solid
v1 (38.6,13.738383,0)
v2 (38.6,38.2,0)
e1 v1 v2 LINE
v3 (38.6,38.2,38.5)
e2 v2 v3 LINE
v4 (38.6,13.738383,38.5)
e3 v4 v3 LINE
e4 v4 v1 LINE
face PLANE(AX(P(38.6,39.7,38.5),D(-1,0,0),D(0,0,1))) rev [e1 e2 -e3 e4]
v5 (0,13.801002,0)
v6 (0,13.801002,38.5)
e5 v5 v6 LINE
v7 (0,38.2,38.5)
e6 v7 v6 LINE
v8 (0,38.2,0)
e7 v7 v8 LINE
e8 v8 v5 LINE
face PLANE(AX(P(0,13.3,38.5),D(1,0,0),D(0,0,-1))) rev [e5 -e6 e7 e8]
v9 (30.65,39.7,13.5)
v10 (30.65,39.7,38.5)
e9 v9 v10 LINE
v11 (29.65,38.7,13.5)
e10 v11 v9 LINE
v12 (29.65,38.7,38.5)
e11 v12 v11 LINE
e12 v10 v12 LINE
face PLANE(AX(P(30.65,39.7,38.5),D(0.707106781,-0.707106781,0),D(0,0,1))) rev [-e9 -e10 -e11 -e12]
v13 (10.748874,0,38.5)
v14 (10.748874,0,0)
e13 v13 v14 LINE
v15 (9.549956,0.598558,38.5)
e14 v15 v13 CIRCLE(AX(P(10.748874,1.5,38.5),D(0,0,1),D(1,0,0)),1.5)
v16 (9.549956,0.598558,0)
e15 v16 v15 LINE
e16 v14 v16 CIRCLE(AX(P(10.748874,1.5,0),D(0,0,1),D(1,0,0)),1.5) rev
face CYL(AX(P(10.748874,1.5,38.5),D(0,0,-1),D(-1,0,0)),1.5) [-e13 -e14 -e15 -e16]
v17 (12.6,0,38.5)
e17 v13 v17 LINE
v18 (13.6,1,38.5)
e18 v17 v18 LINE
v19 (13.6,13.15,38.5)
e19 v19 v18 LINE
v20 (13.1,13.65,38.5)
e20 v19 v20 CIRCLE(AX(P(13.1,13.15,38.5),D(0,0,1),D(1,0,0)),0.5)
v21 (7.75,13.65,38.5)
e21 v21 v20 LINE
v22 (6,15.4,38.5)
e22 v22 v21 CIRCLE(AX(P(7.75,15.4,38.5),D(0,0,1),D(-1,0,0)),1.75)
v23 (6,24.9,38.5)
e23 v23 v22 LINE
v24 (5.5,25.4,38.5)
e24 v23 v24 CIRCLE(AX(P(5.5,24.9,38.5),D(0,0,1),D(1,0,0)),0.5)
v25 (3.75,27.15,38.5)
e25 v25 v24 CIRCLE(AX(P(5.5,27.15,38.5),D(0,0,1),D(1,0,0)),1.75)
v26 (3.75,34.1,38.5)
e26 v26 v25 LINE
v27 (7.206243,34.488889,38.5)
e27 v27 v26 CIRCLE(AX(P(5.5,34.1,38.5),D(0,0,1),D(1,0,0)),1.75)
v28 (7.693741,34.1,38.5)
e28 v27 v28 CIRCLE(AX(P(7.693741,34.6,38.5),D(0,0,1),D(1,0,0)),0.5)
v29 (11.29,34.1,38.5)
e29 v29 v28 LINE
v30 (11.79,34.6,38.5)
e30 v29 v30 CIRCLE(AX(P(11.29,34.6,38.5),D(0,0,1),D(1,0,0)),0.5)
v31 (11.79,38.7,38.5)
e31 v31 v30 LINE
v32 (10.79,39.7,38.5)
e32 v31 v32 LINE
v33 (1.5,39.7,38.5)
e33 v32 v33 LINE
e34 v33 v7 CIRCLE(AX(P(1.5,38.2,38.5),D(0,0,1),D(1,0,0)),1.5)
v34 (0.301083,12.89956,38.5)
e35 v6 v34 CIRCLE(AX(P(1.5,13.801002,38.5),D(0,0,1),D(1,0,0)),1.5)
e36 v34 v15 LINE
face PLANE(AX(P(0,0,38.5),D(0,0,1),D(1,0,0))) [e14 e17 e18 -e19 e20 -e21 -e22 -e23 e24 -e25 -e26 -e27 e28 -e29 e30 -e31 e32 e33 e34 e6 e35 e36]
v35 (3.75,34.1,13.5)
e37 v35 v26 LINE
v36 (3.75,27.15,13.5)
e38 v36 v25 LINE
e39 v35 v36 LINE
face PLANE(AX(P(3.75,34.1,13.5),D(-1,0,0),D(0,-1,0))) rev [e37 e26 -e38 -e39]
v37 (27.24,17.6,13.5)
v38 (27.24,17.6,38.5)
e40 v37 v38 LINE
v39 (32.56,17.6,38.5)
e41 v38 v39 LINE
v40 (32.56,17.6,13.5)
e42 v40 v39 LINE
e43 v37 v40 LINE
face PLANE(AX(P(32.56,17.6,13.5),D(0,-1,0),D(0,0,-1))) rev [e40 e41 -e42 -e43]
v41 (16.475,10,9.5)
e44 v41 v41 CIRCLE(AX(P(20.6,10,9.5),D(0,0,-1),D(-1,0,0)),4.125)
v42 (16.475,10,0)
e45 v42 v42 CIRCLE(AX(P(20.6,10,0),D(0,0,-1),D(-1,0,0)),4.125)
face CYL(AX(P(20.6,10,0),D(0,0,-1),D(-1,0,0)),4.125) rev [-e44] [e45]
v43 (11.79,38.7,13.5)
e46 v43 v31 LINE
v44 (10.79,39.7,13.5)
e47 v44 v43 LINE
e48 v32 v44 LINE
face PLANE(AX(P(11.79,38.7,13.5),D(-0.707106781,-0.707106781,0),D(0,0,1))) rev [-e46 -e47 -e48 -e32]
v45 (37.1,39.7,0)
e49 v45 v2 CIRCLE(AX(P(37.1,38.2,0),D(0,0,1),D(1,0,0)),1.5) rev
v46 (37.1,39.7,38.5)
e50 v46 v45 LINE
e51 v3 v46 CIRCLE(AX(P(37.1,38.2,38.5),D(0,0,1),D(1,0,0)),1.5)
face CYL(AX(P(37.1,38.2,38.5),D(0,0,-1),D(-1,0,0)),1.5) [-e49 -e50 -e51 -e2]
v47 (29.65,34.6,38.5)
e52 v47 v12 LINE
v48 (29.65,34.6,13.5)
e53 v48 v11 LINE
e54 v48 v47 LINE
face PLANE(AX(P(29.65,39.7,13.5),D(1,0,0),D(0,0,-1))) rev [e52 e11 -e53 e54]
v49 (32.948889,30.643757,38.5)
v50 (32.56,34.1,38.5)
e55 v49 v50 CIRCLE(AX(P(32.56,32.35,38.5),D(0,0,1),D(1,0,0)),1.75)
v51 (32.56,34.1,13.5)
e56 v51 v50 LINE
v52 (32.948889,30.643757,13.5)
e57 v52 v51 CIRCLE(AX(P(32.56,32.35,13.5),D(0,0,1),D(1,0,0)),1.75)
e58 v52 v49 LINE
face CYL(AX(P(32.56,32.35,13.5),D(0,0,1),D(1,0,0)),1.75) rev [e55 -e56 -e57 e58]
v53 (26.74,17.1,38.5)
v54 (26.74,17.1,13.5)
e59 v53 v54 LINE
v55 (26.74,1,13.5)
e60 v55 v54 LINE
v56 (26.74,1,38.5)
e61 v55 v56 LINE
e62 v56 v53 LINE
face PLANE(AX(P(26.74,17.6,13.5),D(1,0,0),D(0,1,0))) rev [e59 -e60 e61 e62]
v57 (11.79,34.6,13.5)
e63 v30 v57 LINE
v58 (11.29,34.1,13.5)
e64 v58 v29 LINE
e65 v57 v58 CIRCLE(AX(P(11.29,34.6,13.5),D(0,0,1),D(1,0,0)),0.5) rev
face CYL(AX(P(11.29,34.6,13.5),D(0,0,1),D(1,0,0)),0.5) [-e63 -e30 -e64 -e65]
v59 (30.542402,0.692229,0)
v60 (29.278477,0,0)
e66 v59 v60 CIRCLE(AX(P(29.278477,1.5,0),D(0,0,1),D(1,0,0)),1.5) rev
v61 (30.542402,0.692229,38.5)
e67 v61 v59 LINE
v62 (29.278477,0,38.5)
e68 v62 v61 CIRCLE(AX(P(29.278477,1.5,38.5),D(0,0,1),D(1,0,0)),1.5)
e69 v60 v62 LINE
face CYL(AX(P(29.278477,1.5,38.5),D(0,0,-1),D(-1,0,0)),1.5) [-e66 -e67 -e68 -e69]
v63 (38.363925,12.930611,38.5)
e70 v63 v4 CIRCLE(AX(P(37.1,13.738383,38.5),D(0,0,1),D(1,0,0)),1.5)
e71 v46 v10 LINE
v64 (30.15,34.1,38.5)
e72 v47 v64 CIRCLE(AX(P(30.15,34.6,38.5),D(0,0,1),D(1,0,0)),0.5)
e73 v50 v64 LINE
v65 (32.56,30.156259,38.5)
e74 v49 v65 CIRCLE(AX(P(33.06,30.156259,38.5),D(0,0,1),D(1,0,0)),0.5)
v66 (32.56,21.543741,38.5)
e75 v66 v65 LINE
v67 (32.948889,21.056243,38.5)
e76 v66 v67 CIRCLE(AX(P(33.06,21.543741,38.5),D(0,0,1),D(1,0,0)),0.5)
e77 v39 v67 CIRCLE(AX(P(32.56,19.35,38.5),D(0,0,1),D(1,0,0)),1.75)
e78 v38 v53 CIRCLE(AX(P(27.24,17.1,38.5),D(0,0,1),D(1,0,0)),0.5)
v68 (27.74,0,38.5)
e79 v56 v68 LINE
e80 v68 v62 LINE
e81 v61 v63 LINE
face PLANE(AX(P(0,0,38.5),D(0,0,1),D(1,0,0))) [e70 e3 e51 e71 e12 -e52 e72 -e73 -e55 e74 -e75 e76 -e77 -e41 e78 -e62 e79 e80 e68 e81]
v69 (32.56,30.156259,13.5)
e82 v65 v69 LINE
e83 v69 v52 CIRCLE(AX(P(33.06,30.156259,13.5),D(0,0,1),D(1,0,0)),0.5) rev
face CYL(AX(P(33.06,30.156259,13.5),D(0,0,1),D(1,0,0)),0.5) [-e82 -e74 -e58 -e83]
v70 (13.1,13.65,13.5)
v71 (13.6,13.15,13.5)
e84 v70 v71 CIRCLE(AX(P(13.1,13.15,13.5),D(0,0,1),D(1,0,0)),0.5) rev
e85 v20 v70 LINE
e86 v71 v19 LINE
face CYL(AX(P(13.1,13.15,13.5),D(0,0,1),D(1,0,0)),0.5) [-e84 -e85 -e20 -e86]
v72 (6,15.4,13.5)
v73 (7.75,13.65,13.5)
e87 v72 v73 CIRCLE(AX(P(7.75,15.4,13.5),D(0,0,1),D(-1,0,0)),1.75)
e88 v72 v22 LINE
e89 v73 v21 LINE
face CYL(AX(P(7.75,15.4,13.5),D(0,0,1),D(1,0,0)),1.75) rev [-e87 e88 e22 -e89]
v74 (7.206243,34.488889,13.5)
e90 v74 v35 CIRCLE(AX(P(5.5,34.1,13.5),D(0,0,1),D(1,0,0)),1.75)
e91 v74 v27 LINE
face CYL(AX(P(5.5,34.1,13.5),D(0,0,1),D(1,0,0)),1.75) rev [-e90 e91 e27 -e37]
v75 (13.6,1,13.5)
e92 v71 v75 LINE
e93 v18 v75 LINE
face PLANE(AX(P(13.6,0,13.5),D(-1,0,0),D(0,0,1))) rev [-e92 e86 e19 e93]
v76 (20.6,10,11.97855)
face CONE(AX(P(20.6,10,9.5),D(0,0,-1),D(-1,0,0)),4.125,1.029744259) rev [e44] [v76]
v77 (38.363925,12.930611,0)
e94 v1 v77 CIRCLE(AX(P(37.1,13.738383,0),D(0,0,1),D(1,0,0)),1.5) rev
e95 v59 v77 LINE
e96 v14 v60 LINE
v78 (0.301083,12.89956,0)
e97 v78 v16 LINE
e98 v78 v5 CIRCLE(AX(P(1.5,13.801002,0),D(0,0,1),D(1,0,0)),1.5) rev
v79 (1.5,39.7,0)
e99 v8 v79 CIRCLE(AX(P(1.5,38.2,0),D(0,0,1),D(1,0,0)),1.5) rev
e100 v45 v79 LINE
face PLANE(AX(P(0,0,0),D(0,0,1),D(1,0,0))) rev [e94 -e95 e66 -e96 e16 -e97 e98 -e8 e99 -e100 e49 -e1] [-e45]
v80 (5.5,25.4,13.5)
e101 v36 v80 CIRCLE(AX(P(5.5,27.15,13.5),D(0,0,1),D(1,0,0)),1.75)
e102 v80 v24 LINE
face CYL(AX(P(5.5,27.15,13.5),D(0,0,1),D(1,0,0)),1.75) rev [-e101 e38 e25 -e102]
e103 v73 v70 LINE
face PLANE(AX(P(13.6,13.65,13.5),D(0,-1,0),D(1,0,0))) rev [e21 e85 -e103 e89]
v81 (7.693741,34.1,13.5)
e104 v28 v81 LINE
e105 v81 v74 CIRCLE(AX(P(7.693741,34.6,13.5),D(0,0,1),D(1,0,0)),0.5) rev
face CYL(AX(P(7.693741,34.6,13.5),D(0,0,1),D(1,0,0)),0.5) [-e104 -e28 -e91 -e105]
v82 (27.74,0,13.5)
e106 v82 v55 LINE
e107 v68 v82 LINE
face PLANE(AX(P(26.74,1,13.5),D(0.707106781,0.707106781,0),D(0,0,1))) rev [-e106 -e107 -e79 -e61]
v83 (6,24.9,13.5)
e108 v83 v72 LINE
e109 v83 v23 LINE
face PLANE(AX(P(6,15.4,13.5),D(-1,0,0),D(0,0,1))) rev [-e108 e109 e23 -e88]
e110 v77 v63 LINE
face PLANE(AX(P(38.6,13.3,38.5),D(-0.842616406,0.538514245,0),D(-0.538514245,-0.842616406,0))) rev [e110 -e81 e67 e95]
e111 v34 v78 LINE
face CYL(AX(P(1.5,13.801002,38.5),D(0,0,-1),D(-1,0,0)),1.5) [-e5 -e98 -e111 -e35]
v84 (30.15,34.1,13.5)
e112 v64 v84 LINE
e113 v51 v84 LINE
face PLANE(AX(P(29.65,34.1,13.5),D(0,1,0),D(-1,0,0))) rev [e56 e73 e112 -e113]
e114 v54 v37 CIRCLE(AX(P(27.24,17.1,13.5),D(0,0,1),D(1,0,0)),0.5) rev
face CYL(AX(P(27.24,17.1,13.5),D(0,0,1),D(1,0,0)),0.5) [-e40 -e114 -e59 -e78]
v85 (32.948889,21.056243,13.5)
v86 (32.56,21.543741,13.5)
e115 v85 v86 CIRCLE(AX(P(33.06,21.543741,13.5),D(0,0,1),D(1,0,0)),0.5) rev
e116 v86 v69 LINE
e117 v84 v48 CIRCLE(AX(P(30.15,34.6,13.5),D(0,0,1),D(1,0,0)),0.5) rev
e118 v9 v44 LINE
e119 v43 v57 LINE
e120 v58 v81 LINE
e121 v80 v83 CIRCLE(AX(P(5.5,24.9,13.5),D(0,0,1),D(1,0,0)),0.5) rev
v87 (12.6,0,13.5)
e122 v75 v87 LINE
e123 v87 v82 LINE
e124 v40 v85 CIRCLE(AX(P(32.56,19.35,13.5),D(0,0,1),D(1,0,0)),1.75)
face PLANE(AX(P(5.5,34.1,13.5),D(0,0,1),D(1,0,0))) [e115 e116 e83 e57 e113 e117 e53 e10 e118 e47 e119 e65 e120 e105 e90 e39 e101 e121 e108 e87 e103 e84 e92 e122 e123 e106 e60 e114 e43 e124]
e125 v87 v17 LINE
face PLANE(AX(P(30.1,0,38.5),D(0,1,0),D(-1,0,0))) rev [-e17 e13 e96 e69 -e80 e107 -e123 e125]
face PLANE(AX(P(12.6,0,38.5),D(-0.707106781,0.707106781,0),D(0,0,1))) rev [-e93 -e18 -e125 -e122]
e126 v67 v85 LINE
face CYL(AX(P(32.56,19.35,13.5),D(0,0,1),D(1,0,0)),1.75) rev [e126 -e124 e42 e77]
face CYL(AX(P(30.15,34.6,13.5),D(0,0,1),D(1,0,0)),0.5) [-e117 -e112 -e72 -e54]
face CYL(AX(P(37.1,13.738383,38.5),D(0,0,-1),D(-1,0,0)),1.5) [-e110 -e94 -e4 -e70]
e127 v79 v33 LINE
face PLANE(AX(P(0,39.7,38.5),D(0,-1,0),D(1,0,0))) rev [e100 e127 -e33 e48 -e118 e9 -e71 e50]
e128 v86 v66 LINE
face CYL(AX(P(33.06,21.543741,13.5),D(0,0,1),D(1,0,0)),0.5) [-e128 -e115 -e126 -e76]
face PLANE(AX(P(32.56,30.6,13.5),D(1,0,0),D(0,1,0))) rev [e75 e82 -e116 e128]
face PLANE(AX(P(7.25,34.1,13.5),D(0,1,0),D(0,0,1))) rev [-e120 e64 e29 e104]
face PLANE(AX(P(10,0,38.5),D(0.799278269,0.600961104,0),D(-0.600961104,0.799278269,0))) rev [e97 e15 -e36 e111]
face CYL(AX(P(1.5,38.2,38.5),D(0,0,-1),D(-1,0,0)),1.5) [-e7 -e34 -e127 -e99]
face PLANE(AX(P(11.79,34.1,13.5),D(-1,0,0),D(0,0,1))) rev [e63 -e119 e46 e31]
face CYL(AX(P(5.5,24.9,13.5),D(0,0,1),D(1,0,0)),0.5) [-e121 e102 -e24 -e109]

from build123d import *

# Parameters (mm, degrees)
SALIENTE_EXTRUIR1_DEPTH                      = 38.5
CORTAR_EXTRUIR1_DEPTH                        = 25
REDONDEO2_R                                  = 0.5
REDONDEO3_R                                  = 1.5
PERFORADOR_PARA_ROSCAR_HELICOIL_DE_M81_D     = 8.25
PERFORADOR_PARA_ROSCAR_HELICOIL_DE_M81_DEPTH = 9.5
PERFORADOR_PARA_ROSCAR_HELICOIL_DE_M81_TIP   = 2.478550053
CHAFL_N1_SIZE                                = 1


with BuildPart() as part:
    # Croquis1 → Saliente-Extruir1 (new body)
    with BuildSketch(Plane.XY):
        Polygon((0, 13.3), (0, 39.7), (38.6, 39.7), (38.6, 13.3), (30.1, 0), (10, 0), align=None)
    extrude(amount=SALIENTE_EXTRUIR1_DEPTH)

    # Croquis2 → Cortar-Extruir1 (cut)
    with BuildSketch(Plane.XY.offset(38.5)):
        with BuildLine():
            Line((29.65, 39.7), (29.65, 34.1))
            Line((29.65, 34.1), (32.56, 34.1))
            ThreePointArc((32.56, 34.1), (34.31, 32.35), (32.56, 30.6))
            Line((32.56, 30.6), (32.56, 21.1))
            ThreePointArc((32.56, 21.1), (34.31, 19.35), (32.56, 17.6))
            Line((32.56, 17.6), (26.74, 17.6))
            Line((26.74, 17.6), (26.74, 0))
            Line((26.74, 0), (13.6, 0))
            Line((13.6, 0), (13.6, 13.65))
            Line((13.6, 13.65), (7.75, 13.65))
            ThreePointArc((7.75, 13.65), (6.512563133, 14.162563133), (6, 15.4))
            Line((6, 15.4), (6, 25.4))
            Line((6, 25.4), (5.5, 25.4))
            ThreePointArc((5.5, 25.4), (4.262563133, 25.912563133), (3.75, 27.15))
            Line((3.75, 27.15), (3.75, 34.1))
            ThreePointArc((3.75, 34.1), (5.5, 35.85), (7.25, 34.1))
            Line((7.25, 34.1), (11.79, 34.1))
            Line((11.79, 34.1), (11.79, 39.7))
            Line((11.79, 39.7), (29.65, 39.7))
        make_face()
    extrude(amount=-CORTAR_EXTRUIR1_DEPTH, mode=Mode.SUBTRACT)

    # Redondeo2
    redondeo2_edges = [part.edges().sort_by_distance(p)[0] for p in [
        (13.6, 13.65, 26),
        (11.79, 34.1, 26),
        (29.65, 34.1, 26),
        (32.56, 30.6, 26),
        (32.56, 21.1, 26),
        (26.74, 17.6, 26),
        (7.25, 34.1, 26),
        (6, 25.4, 26),
    ]]
    fillet(redondeo2_edges, radius=REDONDEO2_R - 0.0001)  # a hair under: the kernel refuses the full size

    # Redondeo3
    redondeo3_edges = [part.edges().sort_by_distance(p)[0] for p in [
        (0, 13.3, 19.25),
        (0, 39.7, 19.25),
        (38.6, 39.7, 19.25),
        (38.6, 13.3, 19.25),
        (30.1, 0, 19.25),
        (10, 0, 19.25),
    ]]
    fillet(redondeo3_edges, radius=REDONDEO3_R)

    # Perforador para roscar Helicoil de M81
    with Locations(Plane(origin=(0, 0, 0), x_dir=(-1, 0, 0), z_dir=(0, 0, -1))):
        with Locations((-20.6, 10)):
            Hole(PERFORADOR_PARA_ROSCAR_HELICOIL_DE_M81_D / 2, depth=PERFORADOR_PARA_ROSCAR_HELICOIL_DE_M81_DEPTH)
            with Locations((0, 0, -(PERFORADOR_PARA_ROSCAR_HELICOIL_DE_M81_DEPTH + PERFORADOR_PARA_ROSCAR_HELICOIL_DE_M81_TIP / 2))):  # 118° drill point
                Cone(0, PERFORADOR_PARA_ROSCAR_HELICOIL_DE_M81_D / 2, PERFORADOR_PARA_ROSCAR_HELICOIL_DE_M81_TIP, mode=Mode.SUBTRACT)

    # Chaflán1
    chafl_n1_edges = [part.edges().sort_by_distance(p)[0] for p in [
        (11.79, 39.7, 26),
        (29.65, 39.7, 26),
        (26.74, 0, 26),
        (13.6, 0, 26),
    ]]
    chamfer(chafl_n1_edges, length=CHAFL_N1_SIZE)


solid = part.part
